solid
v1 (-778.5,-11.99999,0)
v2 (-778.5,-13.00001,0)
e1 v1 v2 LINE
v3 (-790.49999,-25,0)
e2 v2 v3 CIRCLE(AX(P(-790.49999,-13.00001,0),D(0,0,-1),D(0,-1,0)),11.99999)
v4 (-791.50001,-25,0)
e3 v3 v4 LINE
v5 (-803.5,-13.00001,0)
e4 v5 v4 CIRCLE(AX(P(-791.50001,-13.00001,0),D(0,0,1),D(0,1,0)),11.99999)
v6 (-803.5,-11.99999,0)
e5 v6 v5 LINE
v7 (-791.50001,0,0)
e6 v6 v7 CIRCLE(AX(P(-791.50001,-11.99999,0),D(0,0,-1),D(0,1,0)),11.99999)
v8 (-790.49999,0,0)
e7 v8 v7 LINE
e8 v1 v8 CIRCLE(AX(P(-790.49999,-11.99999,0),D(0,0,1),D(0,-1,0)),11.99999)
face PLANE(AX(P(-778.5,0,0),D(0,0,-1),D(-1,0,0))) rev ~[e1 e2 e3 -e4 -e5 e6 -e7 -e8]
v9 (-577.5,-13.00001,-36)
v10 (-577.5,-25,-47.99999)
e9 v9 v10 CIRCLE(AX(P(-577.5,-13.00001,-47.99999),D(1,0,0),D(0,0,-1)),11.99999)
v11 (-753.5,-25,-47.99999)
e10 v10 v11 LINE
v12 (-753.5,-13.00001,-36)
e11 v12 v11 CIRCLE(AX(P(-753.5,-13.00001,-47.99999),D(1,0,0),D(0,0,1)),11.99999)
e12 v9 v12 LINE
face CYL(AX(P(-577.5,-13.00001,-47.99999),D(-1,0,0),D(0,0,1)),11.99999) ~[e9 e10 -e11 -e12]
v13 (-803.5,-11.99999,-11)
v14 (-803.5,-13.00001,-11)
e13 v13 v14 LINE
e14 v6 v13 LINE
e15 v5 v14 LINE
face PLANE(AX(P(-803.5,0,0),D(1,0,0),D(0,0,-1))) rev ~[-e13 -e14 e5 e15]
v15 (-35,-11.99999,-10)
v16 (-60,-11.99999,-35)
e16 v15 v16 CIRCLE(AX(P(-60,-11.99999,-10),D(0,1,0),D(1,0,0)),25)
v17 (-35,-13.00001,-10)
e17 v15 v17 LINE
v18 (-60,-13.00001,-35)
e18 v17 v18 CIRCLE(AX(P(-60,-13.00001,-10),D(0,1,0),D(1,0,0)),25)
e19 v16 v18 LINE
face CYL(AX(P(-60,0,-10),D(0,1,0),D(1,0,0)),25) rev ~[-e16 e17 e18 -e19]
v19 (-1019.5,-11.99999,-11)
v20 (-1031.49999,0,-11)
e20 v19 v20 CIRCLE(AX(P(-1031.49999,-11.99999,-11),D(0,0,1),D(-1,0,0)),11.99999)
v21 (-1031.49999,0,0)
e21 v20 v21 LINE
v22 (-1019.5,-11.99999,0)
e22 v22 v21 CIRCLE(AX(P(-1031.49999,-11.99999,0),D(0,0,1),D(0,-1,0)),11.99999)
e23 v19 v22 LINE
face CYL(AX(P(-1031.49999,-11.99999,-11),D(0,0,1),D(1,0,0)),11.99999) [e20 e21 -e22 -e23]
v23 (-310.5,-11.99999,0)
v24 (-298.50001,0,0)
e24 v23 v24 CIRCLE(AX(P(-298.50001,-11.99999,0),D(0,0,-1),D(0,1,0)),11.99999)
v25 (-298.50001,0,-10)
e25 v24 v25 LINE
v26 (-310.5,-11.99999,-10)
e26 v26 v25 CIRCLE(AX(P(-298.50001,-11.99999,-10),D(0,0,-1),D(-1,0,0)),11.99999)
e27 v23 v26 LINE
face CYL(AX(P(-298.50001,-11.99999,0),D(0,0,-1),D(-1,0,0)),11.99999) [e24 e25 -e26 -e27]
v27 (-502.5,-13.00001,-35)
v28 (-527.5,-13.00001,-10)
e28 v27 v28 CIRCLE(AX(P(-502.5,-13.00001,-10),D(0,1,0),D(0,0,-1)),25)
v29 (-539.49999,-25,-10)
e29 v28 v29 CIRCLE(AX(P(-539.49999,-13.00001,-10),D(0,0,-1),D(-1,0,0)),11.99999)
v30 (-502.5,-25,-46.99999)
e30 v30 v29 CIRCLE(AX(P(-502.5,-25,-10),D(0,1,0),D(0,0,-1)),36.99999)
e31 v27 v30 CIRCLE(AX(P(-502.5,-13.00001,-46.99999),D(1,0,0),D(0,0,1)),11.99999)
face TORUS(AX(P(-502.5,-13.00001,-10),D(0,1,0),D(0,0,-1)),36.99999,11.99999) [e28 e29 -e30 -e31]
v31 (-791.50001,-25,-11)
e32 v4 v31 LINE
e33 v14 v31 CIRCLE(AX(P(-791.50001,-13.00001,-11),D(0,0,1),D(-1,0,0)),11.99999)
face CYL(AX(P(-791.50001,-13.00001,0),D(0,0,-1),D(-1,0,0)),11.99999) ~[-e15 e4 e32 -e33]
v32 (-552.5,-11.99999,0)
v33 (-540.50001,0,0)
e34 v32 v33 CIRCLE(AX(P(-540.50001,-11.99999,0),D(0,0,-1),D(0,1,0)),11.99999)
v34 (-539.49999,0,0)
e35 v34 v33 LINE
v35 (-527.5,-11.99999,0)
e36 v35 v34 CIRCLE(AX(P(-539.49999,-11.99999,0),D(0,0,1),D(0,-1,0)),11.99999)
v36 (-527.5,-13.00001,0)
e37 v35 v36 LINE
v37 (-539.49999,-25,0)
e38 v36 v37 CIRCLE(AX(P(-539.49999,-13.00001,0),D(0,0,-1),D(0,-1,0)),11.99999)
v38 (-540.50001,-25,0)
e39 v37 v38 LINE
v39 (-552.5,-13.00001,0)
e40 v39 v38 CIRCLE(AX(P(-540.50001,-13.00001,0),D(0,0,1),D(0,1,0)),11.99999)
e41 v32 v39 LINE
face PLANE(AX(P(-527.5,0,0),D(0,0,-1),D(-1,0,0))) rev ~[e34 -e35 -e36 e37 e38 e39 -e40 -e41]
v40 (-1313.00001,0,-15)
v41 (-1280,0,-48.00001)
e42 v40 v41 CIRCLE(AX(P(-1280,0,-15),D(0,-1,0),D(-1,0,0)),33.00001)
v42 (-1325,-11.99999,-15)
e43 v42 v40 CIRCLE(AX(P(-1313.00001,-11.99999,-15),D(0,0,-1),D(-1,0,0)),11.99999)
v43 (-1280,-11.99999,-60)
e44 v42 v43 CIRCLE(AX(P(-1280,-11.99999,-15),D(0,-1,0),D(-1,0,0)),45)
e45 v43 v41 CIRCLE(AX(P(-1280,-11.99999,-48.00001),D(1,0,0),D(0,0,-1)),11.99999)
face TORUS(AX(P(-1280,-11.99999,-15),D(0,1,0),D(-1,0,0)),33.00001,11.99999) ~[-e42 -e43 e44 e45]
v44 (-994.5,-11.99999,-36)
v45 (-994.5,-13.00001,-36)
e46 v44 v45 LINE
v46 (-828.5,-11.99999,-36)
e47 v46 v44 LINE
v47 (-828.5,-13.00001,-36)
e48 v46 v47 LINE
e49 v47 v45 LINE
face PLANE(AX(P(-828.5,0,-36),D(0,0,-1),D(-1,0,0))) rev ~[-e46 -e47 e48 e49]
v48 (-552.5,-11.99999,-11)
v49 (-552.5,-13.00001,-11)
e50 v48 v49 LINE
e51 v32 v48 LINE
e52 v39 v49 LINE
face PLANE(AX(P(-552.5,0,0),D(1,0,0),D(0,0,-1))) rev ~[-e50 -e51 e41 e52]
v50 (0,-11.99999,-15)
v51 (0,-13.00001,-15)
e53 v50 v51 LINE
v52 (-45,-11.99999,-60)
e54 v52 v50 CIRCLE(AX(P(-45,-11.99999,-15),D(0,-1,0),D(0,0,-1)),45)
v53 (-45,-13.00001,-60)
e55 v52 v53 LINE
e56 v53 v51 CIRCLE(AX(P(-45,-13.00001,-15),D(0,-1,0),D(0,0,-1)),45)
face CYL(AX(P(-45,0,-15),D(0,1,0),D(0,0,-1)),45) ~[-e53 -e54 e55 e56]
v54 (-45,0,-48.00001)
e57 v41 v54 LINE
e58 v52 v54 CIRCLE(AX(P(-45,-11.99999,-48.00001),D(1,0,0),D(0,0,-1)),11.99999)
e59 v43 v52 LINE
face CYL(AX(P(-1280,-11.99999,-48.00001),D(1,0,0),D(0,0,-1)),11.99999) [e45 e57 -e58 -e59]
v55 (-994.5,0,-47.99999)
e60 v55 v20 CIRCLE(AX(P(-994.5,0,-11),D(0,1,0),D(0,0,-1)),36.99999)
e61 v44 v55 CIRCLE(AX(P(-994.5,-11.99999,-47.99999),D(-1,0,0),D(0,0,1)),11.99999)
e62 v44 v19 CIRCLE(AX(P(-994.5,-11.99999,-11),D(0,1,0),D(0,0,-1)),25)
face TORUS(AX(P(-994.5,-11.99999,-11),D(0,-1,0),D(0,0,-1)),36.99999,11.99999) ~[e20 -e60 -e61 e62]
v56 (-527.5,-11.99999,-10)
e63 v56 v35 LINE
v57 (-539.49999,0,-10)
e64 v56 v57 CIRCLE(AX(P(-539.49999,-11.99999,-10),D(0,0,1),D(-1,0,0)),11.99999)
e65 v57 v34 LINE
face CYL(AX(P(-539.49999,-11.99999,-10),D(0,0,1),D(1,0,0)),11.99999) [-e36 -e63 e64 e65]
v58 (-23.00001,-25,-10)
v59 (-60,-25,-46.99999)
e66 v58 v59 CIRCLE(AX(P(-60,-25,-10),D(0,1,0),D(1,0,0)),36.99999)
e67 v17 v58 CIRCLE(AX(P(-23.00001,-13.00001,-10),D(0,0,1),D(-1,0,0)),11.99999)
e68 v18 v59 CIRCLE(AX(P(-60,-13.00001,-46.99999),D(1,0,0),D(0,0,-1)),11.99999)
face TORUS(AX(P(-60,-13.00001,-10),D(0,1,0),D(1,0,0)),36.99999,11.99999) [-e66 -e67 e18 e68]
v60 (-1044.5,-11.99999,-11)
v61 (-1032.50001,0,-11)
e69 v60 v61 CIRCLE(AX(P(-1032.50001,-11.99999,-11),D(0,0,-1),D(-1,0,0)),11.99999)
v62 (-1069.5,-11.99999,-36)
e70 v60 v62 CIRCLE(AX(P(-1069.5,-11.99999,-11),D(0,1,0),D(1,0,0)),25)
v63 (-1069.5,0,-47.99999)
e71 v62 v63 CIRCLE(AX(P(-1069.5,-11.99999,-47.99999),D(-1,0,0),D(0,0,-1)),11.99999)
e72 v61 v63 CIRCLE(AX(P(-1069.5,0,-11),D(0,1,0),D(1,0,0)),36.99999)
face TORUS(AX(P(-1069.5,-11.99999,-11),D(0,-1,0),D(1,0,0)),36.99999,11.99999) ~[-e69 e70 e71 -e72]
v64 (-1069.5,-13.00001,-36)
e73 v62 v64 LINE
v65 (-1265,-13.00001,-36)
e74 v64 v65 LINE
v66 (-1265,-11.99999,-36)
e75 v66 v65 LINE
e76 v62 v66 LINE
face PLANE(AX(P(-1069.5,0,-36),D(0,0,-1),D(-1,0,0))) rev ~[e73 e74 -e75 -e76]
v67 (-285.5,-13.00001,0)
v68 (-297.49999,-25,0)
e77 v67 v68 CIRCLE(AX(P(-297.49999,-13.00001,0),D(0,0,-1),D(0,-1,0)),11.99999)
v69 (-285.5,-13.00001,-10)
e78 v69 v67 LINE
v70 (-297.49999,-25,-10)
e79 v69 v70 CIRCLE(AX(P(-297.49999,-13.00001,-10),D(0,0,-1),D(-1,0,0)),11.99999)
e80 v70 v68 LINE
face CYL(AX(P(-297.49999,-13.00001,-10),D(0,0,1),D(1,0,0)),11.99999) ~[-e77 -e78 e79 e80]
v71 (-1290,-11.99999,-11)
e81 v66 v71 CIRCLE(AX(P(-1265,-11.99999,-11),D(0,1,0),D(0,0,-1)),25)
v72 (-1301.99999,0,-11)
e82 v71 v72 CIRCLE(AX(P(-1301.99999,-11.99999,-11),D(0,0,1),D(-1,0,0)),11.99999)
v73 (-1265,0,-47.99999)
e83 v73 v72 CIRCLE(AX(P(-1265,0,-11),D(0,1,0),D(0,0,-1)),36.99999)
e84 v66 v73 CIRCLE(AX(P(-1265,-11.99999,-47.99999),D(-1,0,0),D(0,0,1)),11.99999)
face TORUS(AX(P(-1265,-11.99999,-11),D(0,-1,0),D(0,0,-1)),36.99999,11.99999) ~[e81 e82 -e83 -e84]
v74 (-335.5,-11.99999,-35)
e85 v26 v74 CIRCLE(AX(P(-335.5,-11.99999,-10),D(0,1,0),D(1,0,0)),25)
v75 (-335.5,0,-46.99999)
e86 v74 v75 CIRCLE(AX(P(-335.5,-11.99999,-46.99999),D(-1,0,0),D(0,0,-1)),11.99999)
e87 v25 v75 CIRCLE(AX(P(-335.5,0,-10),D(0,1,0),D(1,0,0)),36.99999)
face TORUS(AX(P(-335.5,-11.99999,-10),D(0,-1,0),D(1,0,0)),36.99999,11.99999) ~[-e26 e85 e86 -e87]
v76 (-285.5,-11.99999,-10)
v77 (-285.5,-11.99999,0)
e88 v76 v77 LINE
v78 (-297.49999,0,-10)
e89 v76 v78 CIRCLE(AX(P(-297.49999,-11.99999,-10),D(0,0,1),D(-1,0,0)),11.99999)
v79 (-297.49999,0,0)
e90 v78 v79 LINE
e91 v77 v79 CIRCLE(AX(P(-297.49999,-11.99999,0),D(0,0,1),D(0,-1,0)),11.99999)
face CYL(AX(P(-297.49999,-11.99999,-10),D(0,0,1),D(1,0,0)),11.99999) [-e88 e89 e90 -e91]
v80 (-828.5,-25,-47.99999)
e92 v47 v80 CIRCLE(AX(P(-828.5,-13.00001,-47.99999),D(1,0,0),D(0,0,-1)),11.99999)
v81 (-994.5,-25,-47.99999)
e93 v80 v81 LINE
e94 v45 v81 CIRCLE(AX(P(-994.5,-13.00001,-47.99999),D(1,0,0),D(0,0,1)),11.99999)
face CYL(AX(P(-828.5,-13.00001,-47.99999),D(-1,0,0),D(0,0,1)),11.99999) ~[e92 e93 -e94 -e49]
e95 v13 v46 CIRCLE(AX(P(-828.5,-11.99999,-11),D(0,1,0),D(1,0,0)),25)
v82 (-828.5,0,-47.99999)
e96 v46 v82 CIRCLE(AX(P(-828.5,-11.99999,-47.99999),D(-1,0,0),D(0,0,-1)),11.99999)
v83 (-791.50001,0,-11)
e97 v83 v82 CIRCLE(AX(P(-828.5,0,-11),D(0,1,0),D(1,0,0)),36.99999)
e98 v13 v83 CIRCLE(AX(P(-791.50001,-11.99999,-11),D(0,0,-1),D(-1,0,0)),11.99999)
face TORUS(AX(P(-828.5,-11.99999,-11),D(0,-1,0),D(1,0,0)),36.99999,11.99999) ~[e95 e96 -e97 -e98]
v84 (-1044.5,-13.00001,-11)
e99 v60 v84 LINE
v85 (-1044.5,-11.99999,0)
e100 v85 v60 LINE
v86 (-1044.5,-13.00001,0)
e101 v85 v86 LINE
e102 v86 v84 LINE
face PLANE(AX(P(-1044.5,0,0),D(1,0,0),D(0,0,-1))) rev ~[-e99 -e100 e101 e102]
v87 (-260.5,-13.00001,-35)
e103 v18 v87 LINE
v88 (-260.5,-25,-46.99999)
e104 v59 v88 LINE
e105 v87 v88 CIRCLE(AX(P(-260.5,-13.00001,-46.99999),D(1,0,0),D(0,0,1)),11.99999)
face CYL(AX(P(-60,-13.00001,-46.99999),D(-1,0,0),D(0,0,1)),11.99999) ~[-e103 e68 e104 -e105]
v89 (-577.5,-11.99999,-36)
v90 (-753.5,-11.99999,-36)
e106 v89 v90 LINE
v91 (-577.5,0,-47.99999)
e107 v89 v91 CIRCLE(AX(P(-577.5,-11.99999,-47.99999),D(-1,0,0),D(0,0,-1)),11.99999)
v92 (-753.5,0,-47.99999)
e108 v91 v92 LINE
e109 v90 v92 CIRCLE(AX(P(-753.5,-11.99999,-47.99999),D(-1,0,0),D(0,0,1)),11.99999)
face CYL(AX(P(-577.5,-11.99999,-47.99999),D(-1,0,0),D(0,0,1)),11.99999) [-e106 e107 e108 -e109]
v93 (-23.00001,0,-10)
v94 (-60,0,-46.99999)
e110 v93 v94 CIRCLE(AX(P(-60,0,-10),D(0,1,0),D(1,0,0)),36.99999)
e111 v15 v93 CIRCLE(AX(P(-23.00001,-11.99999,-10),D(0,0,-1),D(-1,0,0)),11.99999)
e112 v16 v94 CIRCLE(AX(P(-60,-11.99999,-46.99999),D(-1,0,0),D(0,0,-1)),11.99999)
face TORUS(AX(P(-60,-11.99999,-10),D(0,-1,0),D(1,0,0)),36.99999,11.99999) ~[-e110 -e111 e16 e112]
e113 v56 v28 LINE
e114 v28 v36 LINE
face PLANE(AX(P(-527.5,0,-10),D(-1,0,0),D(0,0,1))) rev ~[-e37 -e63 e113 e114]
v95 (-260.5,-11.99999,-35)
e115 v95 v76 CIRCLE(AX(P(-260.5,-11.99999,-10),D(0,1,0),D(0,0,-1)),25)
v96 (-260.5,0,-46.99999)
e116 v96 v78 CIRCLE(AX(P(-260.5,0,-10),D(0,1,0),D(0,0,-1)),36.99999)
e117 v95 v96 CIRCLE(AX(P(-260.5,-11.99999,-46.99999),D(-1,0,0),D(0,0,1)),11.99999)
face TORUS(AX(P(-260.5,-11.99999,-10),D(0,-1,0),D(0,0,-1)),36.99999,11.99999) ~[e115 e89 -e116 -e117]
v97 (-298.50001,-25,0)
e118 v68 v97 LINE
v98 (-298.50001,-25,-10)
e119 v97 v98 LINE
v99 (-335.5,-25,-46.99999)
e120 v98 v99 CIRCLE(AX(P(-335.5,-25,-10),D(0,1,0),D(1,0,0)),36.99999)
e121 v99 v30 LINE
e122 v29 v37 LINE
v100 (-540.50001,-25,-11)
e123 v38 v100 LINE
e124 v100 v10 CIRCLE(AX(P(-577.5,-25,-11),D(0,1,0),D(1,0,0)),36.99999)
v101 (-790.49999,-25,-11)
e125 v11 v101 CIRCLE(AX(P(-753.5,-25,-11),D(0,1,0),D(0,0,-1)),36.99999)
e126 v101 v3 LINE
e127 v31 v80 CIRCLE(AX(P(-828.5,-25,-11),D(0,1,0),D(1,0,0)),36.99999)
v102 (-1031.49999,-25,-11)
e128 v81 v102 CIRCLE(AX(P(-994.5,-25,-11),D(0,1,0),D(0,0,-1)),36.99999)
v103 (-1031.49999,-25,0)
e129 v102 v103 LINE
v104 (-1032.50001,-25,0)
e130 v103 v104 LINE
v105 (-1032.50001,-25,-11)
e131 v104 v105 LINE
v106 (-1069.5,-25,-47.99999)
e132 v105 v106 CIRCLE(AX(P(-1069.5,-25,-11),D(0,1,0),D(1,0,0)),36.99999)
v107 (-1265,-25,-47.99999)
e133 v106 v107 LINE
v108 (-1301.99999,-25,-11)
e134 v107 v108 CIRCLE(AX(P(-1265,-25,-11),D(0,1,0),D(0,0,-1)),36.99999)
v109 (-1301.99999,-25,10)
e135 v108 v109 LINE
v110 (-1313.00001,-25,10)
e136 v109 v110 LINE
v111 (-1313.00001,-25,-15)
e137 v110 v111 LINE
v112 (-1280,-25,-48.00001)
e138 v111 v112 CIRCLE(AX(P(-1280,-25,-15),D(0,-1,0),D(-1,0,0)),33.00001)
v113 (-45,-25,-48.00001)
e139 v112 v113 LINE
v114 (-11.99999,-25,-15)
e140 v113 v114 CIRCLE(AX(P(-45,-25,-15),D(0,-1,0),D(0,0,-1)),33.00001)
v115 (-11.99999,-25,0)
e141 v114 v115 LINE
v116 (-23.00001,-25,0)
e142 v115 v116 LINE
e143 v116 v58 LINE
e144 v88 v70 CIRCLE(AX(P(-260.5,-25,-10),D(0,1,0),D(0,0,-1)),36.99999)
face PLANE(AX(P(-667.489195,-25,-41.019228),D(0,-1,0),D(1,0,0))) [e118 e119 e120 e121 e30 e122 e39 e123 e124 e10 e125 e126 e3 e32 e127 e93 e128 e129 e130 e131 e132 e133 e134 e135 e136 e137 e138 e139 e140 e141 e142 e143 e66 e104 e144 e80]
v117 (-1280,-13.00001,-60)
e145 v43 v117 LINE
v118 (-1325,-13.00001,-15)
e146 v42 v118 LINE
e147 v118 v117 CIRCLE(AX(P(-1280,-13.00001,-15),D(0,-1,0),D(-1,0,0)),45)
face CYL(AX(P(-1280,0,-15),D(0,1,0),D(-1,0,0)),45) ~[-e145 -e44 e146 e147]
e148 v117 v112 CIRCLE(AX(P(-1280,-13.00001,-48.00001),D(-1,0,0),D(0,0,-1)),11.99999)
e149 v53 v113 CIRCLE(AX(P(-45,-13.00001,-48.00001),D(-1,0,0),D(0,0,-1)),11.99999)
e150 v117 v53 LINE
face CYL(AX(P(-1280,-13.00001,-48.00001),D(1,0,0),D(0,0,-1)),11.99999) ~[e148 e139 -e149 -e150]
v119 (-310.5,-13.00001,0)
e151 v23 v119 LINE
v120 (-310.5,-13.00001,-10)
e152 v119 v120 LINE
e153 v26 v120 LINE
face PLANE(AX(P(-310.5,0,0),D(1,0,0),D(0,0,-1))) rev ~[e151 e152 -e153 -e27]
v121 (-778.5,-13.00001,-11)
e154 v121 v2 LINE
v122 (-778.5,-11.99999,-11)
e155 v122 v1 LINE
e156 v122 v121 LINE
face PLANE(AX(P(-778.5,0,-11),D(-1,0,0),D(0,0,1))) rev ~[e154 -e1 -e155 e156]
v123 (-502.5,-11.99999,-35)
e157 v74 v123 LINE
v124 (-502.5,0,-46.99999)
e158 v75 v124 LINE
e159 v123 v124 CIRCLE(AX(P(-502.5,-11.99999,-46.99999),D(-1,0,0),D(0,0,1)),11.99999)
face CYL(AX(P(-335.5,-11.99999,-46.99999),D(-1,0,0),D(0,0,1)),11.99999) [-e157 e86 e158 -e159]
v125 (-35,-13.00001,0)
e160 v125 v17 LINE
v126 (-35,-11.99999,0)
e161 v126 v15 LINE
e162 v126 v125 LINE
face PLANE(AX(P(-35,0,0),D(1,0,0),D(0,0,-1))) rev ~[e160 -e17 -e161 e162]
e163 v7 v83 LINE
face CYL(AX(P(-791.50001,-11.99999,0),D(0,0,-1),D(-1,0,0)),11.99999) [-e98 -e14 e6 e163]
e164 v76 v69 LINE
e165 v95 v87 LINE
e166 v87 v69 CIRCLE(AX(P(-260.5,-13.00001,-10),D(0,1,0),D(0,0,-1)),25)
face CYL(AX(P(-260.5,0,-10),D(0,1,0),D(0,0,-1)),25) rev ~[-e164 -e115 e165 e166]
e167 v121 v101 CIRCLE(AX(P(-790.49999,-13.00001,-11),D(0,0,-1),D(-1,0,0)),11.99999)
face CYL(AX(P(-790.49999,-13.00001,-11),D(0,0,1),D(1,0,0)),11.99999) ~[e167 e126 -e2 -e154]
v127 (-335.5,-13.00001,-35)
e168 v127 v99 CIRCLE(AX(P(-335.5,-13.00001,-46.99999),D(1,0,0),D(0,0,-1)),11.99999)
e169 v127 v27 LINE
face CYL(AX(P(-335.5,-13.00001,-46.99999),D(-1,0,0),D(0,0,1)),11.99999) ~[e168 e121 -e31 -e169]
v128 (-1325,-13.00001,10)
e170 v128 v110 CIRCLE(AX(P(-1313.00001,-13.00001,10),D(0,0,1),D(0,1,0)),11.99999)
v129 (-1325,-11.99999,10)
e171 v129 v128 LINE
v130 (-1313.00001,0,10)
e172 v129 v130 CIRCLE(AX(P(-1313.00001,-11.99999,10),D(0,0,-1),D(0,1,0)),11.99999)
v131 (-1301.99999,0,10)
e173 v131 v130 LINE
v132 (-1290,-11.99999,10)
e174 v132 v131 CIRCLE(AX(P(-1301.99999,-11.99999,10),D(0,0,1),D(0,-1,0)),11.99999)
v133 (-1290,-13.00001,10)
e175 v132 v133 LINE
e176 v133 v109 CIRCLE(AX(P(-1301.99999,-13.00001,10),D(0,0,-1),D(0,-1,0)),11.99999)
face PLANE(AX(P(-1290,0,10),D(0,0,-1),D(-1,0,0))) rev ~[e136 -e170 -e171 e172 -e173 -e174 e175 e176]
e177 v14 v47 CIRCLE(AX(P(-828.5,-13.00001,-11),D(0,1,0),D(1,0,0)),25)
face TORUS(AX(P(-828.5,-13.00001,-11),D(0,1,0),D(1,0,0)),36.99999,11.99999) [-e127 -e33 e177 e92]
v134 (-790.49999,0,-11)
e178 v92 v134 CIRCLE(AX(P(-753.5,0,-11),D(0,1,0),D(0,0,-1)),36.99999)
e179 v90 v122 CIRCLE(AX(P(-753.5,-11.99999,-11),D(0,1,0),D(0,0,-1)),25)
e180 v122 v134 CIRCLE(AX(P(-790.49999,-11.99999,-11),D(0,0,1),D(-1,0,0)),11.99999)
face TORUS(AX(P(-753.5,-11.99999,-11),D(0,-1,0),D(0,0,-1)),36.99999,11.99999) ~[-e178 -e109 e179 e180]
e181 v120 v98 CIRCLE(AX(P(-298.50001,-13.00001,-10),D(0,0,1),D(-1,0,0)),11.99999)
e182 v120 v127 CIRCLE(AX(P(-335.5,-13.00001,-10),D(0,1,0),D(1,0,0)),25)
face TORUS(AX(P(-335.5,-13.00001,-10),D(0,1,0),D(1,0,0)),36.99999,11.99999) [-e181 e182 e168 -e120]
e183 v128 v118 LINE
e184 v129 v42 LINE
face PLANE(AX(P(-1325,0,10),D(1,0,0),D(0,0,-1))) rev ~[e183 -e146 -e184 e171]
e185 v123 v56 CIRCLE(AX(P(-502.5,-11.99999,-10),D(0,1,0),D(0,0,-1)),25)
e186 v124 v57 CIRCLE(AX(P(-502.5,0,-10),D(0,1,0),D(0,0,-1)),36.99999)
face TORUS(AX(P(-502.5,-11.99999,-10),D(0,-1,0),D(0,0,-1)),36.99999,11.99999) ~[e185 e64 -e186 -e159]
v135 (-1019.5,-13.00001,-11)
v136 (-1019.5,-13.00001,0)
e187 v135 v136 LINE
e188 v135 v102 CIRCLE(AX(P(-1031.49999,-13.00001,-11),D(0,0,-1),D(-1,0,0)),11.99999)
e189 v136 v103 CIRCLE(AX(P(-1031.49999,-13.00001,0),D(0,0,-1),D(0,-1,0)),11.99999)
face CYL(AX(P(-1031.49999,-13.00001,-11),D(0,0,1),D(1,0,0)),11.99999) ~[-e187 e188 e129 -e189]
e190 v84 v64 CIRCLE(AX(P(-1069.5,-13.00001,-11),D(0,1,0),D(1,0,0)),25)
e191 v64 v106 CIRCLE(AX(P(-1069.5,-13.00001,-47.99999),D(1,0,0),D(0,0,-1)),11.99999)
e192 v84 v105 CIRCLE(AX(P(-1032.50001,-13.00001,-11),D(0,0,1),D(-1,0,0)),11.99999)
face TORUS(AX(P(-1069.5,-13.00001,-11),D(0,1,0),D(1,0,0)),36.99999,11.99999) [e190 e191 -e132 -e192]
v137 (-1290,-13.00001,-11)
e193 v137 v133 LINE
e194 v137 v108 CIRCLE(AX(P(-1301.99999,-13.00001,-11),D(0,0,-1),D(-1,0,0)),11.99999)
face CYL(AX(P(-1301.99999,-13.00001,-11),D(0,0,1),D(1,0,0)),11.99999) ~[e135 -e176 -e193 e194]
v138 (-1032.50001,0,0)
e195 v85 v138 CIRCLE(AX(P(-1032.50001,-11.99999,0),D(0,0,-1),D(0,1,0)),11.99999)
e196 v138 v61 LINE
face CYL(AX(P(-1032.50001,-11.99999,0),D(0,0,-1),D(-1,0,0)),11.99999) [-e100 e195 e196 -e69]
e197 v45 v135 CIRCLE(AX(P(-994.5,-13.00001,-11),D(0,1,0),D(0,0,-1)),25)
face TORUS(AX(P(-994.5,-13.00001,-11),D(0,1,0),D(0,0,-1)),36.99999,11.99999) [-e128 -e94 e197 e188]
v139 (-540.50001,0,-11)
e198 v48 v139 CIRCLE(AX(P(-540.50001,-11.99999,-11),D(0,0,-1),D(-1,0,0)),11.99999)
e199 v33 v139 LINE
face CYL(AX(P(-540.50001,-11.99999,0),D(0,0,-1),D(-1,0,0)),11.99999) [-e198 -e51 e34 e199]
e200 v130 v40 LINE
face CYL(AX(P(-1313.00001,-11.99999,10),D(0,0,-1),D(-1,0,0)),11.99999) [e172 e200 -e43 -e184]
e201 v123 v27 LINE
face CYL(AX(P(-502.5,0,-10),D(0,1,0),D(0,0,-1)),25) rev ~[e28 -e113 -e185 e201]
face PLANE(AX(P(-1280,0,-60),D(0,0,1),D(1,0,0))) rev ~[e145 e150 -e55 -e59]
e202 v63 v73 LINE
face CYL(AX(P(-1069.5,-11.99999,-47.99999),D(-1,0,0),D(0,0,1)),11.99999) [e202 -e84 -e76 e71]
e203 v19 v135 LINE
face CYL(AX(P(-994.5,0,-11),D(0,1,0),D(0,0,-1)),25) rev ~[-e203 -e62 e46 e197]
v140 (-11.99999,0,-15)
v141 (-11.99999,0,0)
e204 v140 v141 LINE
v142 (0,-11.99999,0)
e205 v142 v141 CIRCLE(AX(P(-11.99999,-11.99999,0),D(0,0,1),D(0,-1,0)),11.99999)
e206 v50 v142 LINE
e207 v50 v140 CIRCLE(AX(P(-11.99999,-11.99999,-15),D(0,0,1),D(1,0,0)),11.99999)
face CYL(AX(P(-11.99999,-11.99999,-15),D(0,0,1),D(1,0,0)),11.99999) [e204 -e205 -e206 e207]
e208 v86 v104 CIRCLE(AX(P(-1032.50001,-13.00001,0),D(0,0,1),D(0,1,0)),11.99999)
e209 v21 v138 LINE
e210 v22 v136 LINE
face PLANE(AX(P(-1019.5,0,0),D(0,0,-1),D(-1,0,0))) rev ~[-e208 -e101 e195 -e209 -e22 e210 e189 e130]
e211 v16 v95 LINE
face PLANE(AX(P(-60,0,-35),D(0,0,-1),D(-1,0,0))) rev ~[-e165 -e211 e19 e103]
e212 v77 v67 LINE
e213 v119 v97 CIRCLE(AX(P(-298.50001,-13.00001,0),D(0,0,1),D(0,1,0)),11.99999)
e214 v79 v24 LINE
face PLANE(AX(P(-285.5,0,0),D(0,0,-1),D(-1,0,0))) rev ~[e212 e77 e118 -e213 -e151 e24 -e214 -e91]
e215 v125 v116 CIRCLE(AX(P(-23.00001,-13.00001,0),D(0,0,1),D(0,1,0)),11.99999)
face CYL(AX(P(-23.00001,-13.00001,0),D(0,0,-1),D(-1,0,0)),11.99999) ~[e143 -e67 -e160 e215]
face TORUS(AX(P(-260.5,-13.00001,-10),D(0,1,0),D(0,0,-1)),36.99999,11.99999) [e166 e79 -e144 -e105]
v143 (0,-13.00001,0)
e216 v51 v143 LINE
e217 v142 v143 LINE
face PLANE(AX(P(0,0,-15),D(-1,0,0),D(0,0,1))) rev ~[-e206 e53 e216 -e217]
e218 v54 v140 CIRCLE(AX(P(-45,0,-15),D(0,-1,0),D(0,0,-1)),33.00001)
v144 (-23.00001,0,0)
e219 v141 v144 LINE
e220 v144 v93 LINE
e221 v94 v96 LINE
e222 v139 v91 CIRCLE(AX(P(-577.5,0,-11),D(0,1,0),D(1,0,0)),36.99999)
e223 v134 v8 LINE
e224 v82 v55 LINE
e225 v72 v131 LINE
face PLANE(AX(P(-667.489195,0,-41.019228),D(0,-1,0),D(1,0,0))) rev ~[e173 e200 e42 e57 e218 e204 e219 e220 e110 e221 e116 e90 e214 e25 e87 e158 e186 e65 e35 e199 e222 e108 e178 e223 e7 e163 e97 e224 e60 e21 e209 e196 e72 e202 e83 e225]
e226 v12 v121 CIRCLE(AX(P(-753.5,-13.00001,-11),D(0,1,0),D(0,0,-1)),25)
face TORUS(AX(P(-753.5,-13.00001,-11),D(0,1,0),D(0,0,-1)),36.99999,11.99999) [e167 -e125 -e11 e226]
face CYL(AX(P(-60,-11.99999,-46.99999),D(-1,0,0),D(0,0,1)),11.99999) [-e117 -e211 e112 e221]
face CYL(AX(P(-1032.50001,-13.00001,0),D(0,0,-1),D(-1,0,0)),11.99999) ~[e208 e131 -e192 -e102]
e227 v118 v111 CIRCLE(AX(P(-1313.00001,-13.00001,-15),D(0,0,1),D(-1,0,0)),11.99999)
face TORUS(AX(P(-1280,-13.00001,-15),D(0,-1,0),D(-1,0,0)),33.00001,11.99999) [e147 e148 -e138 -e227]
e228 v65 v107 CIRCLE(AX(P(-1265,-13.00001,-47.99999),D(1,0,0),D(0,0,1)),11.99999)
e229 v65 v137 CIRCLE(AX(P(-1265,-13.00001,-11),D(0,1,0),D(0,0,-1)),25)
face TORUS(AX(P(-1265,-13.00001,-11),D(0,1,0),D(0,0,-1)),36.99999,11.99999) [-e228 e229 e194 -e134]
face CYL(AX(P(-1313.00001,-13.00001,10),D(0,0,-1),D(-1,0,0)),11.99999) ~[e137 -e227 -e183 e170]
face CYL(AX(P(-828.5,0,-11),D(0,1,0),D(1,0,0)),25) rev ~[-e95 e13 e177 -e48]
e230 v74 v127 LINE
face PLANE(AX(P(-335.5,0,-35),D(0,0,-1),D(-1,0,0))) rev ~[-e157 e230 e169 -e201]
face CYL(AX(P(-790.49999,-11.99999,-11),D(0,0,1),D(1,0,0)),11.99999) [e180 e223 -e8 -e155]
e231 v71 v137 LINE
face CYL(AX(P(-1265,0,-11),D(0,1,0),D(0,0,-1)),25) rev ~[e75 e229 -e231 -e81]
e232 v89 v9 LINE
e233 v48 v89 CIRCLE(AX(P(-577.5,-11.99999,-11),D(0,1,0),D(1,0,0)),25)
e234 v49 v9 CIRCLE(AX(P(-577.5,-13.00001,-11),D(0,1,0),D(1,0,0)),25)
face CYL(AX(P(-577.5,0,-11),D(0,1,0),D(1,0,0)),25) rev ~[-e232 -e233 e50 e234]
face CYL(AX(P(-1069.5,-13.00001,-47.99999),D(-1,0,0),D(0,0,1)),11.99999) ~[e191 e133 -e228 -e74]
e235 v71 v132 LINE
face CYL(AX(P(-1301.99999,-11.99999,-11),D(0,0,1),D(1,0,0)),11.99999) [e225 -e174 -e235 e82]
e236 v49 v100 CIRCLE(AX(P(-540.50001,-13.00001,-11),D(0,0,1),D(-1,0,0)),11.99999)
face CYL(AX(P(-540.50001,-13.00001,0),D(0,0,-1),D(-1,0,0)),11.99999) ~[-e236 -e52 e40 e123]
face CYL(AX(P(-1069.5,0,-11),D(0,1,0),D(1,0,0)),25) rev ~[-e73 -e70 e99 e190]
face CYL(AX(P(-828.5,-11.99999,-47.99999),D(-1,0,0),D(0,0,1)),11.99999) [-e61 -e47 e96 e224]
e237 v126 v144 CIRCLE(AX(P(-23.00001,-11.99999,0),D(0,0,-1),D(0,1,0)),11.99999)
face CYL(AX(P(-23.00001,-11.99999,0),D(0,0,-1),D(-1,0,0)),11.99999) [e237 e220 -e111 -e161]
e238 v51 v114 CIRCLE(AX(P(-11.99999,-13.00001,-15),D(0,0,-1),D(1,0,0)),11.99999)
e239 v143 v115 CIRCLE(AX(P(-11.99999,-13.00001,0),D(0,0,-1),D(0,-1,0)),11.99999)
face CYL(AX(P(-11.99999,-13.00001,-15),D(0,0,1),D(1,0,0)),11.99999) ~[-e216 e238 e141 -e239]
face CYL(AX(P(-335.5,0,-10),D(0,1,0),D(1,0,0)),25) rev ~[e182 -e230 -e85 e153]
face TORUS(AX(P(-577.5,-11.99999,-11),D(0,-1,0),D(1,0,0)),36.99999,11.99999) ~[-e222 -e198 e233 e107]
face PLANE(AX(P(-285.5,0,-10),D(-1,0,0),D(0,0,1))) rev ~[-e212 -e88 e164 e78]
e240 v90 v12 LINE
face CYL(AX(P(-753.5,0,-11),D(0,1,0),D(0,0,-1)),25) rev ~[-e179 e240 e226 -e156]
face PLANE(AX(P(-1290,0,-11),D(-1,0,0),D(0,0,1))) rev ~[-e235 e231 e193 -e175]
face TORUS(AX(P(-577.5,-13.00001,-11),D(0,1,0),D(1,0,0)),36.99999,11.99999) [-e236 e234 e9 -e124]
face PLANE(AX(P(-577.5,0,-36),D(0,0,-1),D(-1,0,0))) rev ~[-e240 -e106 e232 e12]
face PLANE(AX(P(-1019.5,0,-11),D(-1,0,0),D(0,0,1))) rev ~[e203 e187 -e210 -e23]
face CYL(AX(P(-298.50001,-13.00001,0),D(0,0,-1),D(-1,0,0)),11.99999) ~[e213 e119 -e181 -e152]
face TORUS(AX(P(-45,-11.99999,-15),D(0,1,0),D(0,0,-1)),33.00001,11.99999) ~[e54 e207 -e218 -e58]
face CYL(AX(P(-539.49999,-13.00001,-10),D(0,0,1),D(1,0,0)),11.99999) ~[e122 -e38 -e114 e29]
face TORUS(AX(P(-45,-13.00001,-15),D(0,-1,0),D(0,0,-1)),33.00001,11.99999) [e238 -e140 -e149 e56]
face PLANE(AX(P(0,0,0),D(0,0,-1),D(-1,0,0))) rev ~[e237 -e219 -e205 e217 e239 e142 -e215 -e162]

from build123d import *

# Parameters (mm, degrees)
F1_DEPTH = 25
F2_R     = 11.99999


# Not quite as in the source:
# - a fillet or chamfer is up to 0.001 mm smaller than in the source, because OpenCascade refuses the exact size


with BuildPart() as f1:
    # F0 (on Front) → F1 (new body)
    with BuildSketch(Plane.XZ):
        with BuildLine():
            Line((-1280, -60), (-45, -60))
            ThreePointArc((-45, -60), (-13.1801948466, -46.8198051534), (0, -15))
            Line((0, -15), (0, 0))
            Line((0, 0), (-35, 0))
            Line((-35, 0), (-35, -10))
            ThreePointArc((-35, -10), (-42.3223304703, -27.6776695297), (-60, -35))
            Line((-60, -35), (-260.5, -35))
            ThreePointArc((-260.5, -35), (-278.1776695297, -27.6776695297), (-285.5, -10))
            Line((-285.5, -10), (-285.5, 0))
            Line((-285.5, 0), (-310.5, 0))
            Line((-310.5, 0), (-310.5, -10))
            ThreePointArc((-310.5, -10), (-317.8223304703, -27.6776695297), (-335.5, -35))
            Line((-335.5, -35), (-502.5, -35))
            ThreePointArc((-502.5, -35), (-520.1776695297, -27.6776695297), (-527.5, -10))
            Line((-527.5, -10), (-527.5, 0))
            Line((-527.5, 0), (-552.5, 0))
            Line((-552.5, 0), (-552.5, -11))
            ThreePointArc((-552.5, -11), (-559.8223304703, -28.6776695297), (-577.5, -36))
            Line((-577.5, -36), (-753.5, -36))
            ThreePointArc((-753.5, -36), (-771.1776695297, -28.6776695297), (-778.5, -11))
            Line((-778.5, -11), (-778.5, 0))
            Line((-778.5, 0), (-803.5, 0))
            Line((-803.5, 0), (-803.5, -11))
            ThreePointArc((-803.5, -11), (-810.8223304703, -28.6776695297), (-828.5, -36))
            Line((-828.5, -36), (-994.5, -36))
            ThreePointArc((-994.5, -36), (-1012.1776695297, -28.6776695297), (-1019.5, -11))
            Line((-1019.5, -11), (-1019.5, 0))
            Line((-1019.5, 0), (-1044.5, 0))
            Line((-1044.5, 0), (-1044.5, -11))
            ThreePointArc((-1044.5, -11), (-1051.8223304703, -28.6776695297), (-1069.5, -36))
            Line((-1069.5, -36), (-1265, -36))
            ThreePointArc((-1265, -36), (-1282.6776695297, -28.6776695297), (-1290, -11))
            Line((-1290, -11), (-1290, 10))
            Line((-1290, 10), (-1325, 10))
            Line((-1325, 10), (-1325, -15))
            ThreePointArc((-1325, -15), (-1311.8198051534, -46.8198051534), (-1280, -60))
        make_face()
    extrude(amount=F1_DEPTH)

    # F2 (radius 12 in the source; OpenCascade refuses exactly that, so slightly less here)
    f2_edges = [f1.edges().sort_by_distance(p)[0] for p in [
        (-42.32233, 0, -27.67767),
        (-662.5, 0, -60),
        (-317.82233, 0, -27.67767),
        (-559.82233, 0, -28.67767),
        (-810.82233, 0, -28.67767),
        (-1051.82233, 0, -28.67767),
        (-1311.819805, -25, -46.819805),
        (-1282.67767, -25, -28.67767),
        (-911.5, -25, -36),
        (-665.5, -25, -36),
        (-419, -25, -35),
        (-160.25, -25, -35),
    ]]
    fillet(f2_edges, radius=F2_R)


solid = f1.part
